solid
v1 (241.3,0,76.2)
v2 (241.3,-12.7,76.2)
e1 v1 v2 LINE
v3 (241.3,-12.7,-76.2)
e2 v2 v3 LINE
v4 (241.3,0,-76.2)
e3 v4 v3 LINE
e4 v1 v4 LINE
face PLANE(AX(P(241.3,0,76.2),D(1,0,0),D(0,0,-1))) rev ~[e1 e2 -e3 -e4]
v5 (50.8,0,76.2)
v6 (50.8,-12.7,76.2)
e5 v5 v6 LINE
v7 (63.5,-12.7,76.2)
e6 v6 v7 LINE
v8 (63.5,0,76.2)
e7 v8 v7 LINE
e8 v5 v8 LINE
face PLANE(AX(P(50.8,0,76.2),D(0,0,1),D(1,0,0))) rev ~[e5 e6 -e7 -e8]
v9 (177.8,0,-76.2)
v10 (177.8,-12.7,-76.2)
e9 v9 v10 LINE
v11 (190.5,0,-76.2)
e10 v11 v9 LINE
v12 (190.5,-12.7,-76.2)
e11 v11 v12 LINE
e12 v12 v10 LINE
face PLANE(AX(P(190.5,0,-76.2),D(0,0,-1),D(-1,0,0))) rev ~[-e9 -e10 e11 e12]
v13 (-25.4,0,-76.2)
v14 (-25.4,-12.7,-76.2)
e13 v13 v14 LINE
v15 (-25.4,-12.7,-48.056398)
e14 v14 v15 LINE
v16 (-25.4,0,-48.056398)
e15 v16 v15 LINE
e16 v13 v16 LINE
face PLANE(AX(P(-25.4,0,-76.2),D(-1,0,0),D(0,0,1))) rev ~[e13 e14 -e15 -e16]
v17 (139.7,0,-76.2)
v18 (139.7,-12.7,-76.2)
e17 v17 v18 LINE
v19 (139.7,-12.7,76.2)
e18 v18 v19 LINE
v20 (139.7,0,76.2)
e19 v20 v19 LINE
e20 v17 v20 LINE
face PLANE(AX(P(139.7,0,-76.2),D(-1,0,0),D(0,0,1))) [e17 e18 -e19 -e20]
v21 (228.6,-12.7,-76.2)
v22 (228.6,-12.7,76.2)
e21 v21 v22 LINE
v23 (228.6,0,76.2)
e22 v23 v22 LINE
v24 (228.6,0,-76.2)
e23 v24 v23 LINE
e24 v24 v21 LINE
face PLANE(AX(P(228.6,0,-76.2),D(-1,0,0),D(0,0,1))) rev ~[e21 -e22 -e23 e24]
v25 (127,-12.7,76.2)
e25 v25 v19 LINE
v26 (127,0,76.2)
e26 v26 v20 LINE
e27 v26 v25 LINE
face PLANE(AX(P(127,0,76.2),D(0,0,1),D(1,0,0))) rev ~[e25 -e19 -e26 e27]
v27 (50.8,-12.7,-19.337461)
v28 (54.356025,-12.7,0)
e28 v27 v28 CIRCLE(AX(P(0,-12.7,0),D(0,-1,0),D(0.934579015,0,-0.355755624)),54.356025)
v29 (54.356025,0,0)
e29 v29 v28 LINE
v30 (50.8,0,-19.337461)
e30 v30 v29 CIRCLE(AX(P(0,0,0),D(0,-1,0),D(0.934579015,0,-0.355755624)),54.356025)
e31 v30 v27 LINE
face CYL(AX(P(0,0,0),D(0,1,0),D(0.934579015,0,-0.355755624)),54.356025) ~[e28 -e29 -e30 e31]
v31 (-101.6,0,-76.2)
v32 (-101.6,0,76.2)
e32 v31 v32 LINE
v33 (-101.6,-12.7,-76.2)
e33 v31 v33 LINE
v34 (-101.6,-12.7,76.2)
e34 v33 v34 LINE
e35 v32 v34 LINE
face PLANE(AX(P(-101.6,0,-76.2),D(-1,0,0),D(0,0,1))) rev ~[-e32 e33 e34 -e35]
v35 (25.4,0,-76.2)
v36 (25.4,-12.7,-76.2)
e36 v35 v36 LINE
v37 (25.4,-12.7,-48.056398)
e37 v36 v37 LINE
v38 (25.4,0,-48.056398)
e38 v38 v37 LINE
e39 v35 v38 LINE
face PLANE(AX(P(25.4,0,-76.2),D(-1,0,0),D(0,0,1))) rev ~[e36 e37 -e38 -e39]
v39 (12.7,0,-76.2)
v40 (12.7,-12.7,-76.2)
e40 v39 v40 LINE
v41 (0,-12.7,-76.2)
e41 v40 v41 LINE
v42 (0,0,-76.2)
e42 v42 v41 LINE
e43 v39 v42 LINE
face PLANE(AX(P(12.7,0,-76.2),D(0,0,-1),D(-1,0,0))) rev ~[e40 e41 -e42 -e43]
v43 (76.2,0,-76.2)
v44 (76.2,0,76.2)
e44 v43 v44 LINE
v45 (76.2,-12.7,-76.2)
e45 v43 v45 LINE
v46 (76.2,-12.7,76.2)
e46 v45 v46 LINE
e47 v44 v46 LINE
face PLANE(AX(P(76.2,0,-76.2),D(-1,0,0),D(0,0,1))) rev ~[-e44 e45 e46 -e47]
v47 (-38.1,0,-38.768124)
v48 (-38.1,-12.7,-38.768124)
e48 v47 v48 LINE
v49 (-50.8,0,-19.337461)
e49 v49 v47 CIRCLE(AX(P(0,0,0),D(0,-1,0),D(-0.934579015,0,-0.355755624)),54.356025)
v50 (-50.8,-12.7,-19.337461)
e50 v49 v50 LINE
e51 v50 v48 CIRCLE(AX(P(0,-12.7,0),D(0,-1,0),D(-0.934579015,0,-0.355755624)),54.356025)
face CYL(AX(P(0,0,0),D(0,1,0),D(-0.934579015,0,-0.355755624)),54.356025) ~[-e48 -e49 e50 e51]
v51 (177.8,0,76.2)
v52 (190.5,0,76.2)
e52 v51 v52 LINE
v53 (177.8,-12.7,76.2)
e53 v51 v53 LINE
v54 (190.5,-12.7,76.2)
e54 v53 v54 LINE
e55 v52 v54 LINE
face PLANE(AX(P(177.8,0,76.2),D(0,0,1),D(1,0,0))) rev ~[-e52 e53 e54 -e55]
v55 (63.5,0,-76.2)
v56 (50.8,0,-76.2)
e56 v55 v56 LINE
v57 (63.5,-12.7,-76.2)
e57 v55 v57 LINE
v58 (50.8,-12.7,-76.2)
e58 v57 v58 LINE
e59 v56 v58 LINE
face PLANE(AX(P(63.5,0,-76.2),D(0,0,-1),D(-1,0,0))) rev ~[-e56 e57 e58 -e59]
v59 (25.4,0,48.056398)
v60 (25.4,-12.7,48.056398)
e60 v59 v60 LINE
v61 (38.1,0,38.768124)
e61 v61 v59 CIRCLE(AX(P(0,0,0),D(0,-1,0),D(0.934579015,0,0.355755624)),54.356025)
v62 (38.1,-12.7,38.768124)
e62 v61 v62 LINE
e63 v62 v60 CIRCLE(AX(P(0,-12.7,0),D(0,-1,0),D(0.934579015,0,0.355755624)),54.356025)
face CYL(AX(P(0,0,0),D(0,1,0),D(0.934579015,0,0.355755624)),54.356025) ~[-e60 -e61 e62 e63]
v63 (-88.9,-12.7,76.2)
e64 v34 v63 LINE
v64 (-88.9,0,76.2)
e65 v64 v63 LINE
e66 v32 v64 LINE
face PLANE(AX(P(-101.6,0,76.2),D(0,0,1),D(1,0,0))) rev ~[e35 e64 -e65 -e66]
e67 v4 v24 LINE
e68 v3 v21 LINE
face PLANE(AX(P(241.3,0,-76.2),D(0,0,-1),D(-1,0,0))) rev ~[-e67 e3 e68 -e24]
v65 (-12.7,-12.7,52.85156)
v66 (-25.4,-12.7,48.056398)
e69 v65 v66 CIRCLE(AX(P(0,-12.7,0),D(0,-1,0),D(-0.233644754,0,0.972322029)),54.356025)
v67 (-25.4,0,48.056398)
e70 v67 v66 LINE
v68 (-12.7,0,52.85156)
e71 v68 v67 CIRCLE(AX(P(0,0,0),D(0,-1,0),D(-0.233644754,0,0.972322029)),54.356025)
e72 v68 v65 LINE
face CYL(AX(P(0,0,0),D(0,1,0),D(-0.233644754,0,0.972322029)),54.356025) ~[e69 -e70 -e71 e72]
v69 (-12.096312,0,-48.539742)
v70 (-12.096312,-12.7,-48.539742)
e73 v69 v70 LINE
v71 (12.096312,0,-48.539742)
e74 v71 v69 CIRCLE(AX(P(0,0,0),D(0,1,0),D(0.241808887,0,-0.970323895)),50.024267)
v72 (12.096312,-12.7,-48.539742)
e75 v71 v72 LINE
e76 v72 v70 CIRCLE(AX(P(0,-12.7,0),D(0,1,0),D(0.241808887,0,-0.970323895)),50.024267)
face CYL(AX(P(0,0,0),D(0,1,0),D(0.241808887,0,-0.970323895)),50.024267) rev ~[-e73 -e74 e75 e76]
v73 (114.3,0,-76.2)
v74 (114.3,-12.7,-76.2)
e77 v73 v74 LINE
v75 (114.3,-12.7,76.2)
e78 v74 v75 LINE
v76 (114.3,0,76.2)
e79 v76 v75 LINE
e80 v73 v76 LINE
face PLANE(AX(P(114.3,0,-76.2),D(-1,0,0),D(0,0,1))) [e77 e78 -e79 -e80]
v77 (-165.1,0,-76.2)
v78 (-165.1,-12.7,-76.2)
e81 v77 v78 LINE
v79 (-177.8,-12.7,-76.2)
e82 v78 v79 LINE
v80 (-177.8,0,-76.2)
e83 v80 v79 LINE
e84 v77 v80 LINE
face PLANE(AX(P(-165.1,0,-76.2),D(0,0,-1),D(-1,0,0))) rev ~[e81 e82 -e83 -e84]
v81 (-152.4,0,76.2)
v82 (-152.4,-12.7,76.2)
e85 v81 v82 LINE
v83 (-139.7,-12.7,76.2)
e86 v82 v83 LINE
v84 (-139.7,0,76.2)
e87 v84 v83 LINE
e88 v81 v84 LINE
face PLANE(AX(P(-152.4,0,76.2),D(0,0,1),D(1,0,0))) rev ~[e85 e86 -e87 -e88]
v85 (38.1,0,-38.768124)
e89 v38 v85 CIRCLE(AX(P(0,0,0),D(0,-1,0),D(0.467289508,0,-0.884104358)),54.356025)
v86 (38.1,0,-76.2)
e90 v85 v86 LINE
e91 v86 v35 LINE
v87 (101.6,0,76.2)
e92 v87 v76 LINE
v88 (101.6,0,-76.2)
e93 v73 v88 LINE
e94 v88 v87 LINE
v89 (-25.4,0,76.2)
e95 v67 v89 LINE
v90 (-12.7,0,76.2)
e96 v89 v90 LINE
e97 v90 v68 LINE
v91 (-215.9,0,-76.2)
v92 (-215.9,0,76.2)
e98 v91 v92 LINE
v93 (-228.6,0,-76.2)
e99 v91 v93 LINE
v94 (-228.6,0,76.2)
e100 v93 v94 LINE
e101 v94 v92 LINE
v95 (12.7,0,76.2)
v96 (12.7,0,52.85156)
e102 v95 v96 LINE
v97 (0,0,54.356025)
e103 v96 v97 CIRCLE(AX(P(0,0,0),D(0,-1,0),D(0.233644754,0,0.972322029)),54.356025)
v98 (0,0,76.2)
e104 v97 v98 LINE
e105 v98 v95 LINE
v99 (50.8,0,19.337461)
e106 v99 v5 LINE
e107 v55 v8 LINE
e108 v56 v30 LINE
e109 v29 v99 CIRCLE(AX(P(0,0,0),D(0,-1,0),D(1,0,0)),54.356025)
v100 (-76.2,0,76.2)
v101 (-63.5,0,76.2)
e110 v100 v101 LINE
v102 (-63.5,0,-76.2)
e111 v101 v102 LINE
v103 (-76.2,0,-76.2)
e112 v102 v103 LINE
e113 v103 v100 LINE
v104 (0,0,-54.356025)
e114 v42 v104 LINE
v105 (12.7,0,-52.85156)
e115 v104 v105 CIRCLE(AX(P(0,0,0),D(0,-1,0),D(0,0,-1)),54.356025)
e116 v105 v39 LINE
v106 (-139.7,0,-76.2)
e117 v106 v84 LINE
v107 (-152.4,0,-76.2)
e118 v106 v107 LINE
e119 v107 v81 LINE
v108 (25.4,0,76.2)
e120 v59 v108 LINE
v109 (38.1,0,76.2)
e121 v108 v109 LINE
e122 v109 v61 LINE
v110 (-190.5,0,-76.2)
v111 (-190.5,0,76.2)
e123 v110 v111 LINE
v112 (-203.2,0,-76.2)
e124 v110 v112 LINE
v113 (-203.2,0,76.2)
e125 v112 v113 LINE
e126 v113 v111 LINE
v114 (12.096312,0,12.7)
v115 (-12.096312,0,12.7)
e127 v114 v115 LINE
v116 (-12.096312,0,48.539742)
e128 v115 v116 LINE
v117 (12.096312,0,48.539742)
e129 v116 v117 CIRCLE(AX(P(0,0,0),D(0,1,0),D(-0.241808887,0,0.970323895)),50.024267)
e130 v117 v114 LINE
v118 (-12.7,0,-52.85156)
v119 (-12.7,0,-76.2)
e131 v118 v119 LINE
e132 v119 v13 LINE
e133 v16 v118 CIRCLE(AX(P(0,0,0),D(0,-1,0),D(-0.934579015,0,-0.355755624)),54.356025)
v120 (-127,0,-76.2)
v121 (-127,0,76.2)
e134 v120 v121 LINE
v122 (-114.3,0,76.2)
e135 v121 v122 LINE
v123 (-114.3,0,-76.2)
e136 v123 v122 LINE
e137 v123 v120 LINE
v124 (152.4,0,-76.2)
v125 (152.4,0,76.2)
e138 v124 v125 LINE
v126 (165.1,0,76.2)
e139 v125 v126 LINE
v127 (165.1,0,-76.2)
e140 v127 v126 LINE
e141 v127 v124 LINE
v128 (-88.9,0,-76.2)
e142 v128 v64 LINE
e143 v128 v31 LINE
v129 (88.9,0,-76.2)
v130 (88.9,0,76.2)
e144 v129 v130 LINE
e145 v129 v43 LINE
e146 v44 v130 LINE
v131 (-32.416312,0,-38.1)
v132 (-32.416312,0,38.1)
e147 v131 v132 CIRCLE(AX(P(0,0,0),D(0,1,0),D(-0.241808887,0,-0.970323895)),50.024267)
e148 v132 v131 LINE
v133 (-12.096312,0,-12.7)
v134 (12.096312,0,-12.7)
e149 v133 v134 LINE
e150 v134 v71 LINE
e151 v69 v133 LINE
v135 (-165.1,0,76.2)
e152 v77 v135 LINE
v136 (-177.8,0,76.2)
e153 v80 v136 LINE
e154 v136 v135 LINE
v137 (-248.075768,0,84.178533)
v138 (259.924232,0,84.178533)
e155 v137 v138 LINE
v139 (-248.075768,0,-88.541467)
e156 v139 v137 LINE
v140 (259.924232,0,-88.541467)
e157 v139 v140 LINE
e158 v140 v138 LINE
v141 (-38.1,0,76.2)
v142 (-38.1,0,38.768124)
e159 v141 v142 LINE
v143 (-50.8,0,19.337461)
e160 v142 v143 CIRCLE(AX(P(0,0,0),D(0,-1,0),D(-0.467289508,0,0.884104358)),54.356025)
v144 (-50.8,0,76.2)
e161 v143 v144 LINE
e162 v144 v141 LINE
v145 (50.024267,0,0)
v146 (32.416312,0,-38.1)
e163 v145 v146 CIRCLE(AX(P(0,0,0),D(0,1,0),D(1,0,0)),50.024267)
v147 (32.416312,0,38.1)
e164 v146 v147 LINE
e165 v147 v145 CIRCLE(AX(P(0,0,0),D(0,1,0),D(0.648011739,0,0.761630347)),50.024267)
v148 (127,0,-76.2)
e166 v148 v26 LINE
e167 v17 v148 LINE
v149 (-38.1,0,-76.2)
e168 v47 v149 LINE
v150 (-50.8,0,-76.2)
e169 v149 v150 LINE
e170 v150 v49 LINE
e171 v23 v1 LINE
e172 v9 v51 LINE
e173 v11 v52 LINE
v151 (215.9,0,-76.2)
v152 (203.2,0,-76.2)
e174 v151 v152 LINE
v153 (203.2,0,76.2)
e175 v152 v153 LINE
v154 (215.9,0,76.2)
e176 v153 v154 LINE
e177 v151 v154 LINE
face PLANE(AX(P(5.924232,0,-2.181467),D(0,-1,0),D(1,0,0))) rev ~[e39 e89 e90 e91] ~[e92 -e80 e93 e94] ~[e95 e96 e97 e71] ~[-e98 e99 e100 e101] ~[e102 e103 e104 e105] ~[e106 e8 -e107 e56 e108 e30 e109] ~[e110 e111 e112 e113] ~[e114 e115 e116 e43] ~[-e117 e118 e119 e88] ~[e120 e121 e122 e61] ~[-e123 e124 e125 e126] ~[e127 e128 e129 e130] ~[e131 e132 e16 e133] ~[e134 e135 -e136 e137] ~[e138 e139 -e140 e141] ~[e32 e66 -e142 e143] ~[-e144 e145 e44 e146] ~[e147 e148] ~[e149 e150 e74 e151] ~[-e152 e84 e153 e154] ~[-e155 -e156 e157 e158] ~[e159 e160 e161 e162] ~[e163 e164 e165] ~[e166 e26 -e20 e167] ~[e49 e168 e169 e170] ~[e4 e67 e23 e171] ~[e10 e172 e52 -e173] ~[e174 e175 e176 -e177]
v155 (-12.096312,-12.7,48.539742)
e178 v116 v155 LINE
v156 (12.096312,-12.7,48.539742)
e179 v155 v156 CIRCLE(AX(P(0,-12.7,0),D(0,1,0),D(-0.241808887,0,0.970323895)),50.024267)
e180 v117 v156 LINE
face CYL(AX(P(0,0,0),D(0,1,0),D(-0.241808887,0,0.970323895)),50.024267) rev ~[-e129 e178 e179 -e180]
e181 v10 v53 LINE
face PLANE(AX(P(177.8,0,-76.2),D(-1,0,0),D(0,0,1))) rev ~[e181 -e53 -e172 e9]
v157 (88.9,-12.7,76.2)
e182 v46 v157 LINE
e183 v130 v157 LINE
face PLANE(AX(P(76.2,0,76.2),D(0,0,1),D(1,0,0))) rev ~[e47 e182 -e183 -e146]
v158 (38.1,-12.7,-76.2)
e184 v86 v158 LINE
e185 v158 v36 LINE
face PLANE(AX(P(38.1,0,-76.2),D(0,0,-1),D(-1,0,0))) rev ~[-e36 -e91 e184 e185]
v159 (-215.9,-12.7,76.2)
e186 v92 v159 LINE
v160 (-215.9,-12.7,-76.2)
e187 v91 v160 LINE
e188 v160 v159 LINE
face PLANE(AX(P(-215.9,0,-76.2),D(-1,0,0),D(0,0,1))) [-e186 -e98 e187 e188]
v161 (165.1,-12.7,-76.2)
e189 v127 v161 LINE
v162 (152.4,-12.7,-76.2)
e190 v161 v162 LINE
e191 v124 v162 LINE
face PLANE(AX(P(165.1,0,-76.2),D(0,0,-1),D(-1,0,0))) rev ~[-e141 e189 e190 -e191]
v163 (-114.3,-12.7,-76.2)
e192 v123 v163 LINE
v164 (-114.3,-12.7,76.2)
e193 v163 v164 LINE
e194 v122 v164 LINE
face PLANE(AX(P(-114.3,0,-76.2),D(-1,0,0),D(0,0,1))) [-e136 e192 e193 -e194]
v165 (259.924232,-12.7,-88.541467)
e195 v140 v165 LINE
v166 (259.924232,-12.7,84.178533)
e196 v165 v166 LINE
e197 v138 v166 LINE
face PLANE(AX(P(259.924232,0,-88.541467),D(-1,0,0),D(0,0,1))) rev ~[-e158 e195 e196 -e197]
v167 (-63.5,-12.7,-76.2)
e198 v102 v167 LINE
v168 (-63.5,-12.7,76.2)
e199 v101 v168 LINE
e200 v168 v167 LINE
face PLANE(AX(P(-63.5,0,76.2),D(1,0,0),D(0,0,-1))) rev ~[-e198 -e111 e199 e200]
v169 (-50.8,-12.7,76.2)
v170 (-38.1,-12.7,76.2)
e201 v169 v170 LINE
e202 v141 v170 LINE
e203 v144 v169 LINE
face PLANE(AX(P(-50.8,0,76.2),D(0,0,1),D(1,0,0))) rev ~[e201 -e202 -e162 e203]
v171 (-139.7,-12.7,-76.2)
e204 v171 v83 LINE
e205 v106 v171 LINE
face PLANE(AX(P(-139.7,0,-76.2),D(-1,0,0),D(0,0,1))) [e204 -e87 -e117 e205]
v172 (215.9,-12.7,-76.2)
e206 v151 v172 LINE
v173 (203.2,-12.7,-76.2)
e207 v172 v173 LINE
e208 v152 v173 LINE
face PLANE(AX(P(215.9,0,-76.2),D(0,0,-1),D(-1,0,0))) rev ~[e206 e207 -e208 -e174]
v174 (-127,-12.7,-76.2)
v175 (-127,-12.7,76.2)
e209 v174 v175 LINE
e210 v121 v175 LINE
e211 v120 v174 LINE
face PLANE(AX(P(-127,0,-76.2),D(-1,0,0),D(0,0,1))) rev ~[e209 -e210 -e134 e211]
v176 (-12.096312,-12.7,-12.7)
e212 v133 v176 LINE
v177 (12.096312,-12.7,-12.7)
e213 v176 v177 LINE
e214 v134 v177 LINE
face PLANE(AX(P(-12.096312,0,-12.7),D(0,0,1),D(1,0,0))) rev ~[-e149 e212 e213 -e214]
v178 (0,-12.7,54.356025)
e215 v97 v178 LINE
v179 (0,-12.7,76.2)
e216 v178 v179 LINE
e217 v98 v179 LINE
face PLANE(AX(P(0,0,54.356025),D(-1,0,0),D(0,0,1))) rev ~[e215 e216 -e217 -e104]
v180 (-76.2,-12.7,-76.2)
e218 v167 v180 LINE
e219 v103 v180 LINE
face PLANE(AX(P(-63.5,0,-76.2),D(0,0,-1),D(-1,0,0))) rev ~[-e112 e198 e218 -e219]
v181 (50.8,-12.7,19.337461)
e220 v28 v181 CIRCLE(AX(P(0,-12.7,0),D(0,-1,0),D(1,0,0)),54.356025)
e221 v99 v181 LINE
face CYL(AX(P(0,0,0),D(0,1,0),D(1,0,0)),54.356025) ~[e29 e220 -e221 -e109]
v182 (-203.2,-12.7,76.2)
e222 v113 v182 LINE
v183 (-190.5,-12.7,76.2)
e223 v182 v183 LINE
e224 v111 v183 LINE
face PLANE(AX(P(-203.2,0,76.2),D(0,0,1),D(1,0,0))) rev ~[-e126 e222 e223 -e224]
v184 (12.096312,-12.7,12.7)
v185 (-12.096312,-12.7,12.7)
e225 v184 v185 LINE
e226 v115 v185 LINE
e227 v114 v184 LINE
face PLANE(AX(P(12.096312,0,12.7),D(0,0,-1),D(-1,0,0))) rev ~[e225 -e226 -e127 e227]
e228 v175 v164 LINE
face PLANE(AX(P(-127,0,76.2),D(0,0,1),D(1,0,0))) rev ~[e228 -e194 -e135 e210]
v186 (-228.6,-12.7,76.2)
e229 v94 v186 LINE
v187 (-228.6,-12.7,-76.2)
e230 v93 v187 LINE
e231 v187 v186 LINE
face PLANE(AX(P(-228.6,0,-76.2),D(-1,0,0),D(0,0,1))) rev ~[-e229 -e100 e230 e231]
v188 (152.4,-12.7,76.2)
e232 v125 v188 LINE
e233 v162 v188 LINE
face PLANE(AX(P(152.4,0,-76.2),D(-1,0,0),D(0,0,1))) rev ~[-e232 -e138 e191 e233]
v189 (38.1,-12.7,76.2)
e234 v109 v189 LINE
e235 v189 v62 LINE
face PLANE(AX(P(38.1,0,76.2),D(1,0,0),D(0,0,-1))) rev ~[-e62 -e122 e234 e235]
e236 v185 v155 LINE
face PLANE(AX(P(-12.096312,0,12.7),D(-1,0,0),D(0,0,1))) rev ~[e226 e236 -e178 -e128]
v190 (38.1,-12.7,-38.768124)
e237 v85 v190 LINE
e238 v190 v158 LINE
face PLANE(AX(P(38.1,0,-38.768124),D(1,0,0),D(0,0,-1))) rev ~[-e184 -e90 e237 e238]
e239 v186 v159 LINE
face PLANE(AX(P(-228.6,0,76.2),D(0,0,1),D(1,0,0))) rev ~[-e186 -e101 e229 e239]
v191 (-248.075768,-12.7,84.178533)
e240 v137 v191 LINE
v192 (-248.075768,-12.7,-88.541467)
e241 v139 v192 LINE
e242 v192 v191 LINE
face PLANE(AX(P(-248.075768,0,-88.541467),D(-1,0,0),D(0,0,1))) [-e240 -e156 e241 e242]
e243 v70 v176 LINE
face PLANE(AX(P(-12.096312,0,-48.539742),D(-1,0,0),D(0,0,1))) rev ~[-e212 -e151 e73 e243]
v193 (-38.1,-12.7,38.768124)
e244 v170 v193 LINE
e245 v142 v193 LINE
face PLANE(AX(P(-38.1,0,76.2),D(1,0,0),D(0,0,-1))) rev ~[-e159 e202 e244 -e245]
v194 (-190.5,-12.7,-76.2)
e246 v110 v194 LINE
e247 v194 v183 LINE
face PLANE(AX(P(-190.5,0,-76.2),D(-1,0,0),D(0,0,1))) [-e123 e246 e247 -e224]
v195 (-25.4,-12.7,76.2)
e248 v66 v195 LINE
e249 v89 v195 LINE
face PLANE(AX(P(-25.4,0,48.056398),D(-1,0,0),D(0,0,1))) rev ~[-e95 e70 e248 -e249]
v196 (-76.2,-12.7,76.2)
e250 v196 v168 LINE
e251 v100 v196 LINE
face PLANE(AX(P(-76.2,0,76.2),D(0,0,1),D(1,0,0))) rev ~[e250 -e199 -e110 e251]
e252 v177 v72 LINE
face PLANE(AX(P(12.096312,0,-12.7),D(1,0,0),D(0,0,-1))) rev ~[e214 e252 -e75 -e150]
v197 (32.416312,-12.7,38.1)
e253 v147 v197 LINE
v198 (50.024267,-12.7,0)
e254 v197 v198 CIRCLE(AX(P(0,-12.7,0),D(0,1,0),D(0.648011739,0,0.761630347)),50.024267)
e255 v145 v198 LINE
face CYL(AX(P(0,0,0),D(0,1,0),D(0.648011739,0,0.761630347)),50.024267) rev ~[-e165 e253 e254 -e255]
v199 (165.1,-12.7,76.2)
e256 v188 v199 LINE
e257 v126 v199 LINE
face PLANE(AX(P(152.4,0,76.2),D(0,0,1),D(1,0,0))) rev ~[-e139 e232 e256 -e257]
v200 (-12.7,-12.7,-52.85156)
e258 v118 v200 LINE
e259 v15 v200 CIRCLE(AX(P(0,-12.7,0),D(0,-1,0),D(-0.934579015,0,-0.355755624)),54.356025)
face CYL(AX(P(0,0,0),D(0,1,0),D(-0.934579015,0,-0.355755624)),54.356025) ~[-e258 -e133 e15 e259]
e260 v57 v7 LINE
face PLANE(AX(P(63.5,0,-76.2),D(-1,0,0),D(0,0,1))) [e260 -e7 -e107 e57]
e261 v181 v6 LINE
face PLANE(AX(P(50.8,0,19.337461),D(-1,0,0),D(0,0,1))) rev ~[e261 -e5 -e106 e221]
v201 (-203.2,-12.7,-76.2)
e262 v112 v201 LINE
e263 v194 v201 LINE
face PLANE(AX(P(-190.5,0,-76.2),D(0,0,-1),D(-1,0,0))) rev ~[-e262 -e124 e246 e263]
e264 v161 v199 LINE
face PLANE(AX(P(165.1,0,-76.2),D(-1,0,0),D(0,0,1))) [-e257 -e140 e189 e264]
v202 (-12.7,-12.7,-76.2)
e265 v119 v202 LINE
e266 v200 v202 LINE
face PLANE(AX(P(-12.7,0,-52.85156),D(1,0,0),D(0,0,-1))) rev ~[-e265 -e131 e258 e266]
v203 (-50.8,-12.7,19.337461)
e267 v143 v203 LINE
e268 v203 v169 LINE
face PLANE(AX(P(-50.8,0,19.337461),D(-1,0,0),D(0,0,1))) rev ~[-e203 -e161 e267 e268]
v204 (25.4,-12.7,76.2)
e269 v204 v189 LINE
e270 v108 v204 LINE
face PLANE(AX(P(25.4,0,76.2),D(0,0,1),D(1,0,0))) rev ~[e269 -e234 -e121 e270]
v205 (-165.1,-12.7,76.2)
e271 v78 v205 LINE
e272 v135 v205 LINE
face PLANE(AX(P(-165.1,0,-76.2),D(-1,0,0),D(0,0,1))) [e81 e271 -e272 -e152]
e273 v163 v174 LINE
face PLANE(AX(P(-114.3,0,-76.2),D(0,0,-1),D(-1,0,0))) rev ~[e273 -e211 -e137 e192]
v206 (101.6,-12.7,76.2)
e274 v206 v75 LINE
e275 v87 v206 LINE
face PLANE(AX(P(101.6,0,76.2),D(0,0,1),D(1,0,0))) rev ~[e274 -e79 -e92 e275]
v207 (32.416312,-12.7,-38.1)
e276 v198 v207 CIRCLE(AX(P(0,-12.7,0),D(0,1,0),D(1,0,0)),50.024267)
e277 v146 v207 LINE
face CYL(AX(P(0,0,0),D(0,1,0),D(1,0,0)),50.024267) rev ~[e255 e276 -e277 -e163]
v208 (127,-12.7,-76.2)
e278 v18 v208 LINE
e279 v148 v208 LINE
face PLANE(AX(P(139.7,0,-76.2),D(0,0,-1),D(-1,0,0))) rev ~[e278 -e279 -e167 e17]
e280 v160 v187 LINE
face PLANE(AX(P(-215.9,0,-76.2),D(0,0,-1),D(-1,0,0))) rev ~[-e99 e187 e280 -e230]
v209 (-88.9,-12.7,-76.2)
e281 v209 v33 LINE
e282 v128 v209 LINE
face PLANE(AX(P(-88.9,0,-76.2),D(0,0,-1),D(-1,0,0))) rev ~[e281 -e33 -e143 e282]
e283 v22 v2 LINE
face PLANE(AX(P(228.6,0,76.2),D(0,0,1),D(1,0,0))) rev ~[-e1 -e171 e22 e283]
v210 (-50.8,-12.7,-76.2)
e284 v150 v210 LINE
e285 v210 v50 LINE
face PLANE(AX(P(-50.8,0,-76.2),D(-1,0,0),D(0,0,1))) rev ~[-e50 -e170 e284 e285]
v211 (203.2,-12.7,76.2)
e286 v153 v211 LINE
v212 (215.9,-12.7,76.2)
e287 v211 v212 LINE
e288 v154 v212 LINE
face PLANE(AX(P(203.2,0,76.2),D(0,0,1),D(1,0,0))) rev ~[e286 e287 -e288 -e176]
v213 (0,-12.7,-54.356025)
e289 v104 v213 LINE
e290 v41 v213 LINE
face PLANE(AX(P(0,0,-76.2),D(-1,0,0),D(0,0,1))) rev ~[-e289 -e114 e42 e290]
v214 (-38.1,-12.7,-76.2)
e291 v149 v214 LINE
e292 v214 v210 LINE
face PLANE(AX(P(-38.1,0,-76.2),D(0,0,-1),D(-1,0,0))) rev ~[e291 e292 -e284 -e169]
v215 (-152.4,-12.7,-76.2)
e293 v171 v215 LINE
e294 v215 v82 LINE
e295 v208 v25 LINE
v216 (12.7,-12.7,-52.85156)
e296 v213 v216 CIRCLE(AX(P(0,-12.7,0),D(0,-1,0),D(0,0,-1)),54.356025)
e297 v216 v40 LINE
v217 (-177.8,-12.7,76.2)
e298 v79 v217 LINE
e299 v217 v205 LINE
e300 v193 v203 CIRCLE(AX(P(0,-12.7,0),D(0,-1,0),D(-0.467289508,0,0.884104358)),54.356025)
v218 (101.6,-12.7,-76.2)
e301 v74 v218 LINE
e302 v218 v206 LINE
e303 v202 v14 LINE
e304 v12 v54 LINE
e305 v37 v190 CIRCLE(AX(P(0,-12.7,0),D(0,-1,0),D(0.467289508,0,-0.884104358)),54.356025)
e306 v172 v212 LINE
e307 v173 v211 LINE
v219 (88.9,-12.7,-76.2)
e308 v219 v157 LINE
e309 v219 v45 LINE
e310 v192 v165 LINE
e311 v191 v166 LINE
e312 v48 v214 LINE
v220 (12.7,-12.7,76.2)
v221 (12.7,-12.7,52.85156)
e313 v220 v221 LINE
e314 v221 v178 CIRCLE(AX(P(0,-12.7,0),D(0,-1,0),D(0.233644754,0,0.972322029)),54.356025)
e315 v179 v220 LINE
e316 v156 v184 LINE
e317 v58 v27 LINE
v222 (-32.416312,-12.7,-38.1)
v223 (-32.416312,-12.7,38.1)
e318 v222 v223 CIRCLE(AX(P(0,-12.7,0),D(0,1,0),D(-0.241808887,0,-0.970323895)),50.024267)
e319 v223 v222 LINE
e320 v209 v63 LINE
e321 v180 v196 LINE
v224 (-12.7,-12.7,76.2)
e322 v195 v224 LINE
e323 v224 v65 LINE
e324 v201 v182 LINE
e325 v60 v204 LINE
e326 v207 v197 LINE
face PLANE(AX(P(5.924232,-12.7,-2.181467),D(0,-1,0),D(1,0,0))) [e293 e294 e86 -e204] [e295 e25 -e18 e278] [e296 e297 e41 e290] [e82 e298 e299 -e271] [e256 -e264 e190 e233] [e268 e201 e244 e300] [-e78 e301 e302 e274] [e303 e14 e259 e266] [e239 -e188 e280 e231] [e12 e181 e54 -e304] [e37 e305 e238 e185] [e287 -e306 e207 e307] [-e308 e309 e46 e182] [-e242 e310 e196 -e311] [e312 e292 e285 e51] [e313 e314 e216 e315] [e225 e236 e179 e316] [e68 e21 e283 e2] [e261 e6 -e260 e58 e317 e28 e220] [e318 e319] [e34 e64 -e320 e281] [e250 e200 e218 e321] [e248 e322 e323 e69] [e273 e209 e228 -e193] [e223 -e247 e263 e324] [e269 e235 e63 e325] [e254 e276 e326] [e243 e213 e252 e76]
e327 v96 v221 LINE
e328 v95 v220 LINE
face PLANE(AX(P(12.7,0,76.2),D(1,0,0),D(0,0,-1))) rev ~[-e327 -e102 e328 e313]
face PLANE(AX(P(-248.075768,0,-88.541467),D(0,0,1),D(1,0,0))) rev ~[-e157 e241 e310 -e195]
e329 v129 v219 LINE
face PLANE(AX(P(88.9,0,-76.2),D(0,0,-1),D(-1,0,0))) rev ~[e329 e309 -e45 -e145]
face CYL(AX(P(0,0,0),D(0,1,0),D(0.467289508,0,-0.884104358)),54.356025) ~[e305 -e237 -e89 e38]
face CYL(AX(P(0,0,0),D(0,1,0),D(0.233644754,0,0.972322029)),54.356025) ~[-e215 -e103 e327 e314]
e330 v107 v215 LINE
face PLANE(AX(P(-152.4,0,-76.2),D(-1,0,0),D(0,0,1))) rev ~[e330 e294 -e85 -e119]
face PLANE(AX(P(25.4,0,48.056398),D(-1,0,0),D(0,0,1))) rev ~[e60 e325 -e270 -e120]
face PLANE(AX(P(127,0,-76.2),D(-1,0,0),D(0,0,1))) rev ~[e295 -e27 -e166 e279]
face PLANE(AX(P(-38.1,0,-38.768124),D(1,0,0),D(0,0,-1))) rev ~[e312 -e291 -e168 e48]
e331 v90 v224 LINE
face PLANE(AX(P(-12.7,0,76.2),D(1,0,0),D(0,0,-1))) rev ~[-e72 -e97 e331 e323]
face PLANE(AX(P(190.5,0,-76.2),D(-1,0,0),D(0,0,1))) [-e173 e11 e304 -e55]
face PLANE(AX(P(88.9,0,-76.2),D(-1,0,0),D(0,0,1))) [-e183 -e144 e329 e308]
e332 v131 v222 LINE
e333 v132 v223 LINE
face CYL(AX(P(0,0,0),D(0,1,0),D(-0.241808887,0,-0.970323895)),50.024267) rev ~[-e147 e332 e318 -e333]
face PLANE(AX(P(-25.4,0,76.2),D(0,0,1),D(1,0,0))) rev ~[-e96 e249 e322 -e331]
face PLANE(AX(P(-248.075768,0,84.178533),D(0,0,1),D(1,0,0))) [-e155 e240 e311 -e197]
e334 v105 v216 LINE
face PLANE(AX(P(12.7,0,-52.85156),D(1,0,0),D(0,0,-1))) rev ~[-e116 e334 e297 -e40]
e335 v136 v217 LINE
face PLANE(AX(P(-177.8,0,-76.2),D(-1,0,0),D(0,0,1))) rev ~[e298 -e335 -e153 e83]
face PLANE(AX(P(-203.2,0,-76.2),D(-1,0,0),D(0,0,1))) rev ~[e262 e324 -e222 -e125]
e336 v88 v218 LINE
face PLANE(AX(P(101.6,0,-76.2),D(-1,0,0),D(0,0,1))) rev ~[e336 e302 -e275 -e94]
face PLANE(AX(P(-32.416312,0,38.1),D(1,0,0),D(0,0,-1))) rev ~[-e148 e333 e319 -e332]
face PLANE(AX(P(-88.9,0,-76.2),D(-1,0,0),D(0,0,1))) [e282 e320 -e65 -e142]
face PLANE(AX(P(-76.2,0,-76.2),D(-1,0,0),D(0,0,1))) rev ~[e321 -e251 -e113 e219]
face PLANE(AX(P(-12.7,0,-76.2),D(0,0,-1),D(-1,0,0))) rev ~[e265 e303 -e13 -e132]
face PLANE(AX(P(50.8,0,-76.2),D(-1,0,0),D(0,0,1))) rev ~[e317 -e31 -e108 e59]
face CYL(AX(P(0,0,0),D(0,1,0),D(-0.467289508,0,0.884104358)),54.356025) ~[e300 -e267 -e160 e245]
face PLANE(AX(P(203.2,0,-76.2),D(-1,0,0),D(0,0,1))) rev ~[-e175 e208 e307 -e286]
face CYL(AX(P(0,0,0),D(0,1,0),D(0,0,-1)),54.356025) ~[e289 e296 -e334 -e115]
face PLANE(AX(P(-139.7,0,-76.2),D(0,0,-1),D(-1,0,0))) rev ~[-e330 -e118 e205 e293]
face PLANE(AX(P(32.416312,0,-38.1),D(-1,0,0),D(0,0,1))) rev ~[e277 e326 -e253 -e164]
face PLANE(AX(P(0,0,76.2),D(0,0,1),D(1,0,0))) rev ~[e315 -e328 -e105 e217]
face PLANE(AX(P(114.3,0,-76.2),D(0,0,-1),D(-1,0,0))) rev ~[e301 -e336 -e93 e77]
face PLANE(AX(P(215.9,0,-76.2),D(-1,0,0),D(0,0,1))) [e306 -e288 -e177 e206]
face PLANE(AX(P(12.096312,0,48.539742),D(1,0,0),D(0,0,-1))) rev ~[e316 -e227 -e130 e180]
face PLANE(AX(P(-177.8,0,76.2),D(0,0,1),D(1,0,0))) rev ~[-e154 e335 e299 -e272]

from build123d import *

# Parameters (mm, degrees)
F0_W     = 508
F0_H     = 172.72
F0_W_2   = 12.7
F0_H_2   = 152.4
F1_DEPTH = 12.7


# Not quite as in the source:
# - a feature names something its author has since deleted; it is built from what else it names


with BuildPart() as f1:
    # F0 (on Front) → F1 (new body)
    with BuildSketch(Plane.XZ):
        with Locations((5.9242316484, -2.1814669756)):
            Rectangle(F0_W, F0_H)
        Polygon((215.9, 76.2), (228.6, 76.2), (241.3, 76.2), (241.3, -76.2), (228.6, -76.2), (215.9, -76.2), (203.2, -76.2), (190.5, -76.2), (177.8, -76.2), (165.1, -76.2), (152.4, -76.2), (139.7, -76.2), (127, -76.2), (114.3, -76.2), (101.6, -76.2), (88.9, -76.2), (76.2, -76.2), (63.5, -76.2), (50.8, -76.2), (38.1, -76.2), (25.4, -76.2), (12.7, -76.2), (0, -76.2), (-12.7, -76.2), (-25.4, -76.2), (-38.1, -76.2), (-50.8, -76.2), (-63.5, -76.2), (-76.2, -76.2), (-88.9, -76.2), (-101.6, -76.2), (-114.3, -76.2), (-127, -76.2), (-139.7, -76.2), (-152.4, -76.2), (-165.1, -76.2), (-177.8, -76.2), (-190.5, -76.2), (-203.2, -76.2), (-215.9, -76.2), (-228.6, -76.2), (-228.6, 76.2), (-215.9, 76.2), (-203.2, 76.2), (-190.5, 76.2), (-177.8, 76.2), (-165.1, 76.2), (-152.4, 76.2), (-139.7, 76.2), (-127, 76.2), (-114.3, 76.2), (-101.6, 76.2), (-88.9, 76.2), (-76.2, 76.2), (-63.5, 76.2), (-50.8, 76.2), (-38.1, 76.2), (-25.4, 76.2), (-12.7, 76.2), (0, 76.2), (12.7, 76.2), (25.4, 76.2), (38.1, 76.2), (50.8, 76.2), (63.5, 76.2), (76.2, 76.2), (88.9, 76.2), (101.6, 76.2), (114.3, 76.2), (127, 76.2), (139.7, 76.2), (152.4, 76.2), (165.1, 76.2), (177.8, 76.2), (190.5, 76.2), (203.2, 76.2), align=None, mode=Mode.SUBTRACT)
        with BuildLine():
            ThreePointArc((54.3560246605, 0), (53.4596271482, 9.8308535779), (50.8, 19.3374614904))
            ThreePointArc((50.8, 19.3374614904), (45.4993423984, 29.7386492331), (38.1, 38.7681237216))
            ThreePointArc((38.1, 38.7681237216), (32.0878561317, 43.8742168678), (25.4, 48.056398293))
            ThreePointArc((25.4, 48.056398293), (19.2002837078, 50.8520060807), (12.7, 52.8515602125))
            ThreePointArc((12.7, 52.8515602125), (6.3944001532, 53.9785981994), (0, 54.3560246605))
            ThreePointArc((0, 54.3560246605), (-6.3944001532, 53.9785981994), (-12.7, 52.8515602125))
            ThreePointArc((-12.7, 52.8515602125), (-19.2002837078, 50.8520060807), (-25.4, 48.056398293))
            ThreePointArc((-25.4, 48.056398293), (-32.0878561317, 43.8742168678), (-38.1, 38.7681237216))
            ThreePointArc((-38.1, 38.7681237216), (-45.4993423984, 29.7386492331), (-50.8, 19.3374614904))
            ThreePointArc((-50.8, 19.3374614904), (-54.3560246605, 0), (-50.8, -19.3374614904))
            ThreePointArc((-50.8, -19.3374614904), (-45.4993423984, -29.7386492331), (-38.1, -38.7681237216))
            ThreePointArc((-38.1, -38.7681237216), (-32.0878561317, -43.8742168678), (-25.4, -48.056398293))
            ThreePointArc((-25.4, -48.056398293), (-19.2002837078, -50.8520060807), (-12.7, -52.8515602125))
            ThreePointArc((-12.7, -52.8515602125), (-6.3944001532, -53.9785981994), (0, -54.3560246605))
            ThreePointArc((0, -54.3560246605), (6.3944001532, -53.9785981994), (12.7, -52.8515602125))
            ThreePointArc((12.7, -52.8515602125), (19.2002837078, -50.8520060807), (25.4, -48.056398293))
            ThreePointArc((25.4, -48.056398293), (32.0878561317, -43.8742168678), (38.1, -38.7681237216))
            ThreePointArc((38.1, -38.7681237216), (45.4993423984, -29.7386492331), (50.8, -19.3374614904))
            ThreePointArc((50.8, -19.3374614904), (53.4596271482, -9.8308535779), (54.3560246605, 0))
        make_face()
        with BuildLine():
            ThreePointArc((32.4163123757, 38.1), (45.4094130092, 20.9860076765), (50.0242671914, 0))
            ThreePointArc((50.0242671914, 0), (45.4094130092, -20.9860076765), (32.4163123757, -38.1))
            ThreePointArc((32.4163123757, -38.1), (22.8602382496, -44.4953572321), (12.0963123757, -48.5397418097))
            ThreePointArc((12.0963123757, -48.5397418097), (0, -50.0242671914), (-12.0963123757, -48.5397418097))
            ThreePointArc((-12.0963123757, -48.5397418097), (-22.8602382496, -44.4953572321), (-32.4163123757, -38.1))
            ThreePointArc((-32.4163123757, -38.1), (-50.0242671914, 0), (-32.4163123757, 38.1))
            ThreePointArc((-32.4163123757, 38.1), (-22.8602382496, 44.4953572321), (-12.0963123757, 48.5397418097))
            ThreePointArc((-12.0963123757, 48.5397418097), (0, 50.0242671914), (12.0963123757, 48.5397418097))
            ThreePointArc((12.0963123757, 48.5397418097), (22.8602382496, 44.4953572321), (32.4163123757, 38.1))
        make_face(mode=Mode.SUBTRACT)
        Polygon((32.4163123757, -38.1), (32.4163123757, 38.1), (12.0963123757, 38.1), (12.0963123757, 12.7), (-12.0963123757, 12.7), (-12.0963123757, 38.1), (-32.4163123757, 38.1), (-32.4163123757, -38.1), (-12.0963123757, -38.1), (-12.0963123757, -12.7), (12.0963123757, -12.7), (12.0963123757, -38.1), align=None)
        with Locations((-209.55, 0)):
            Rectangle(F0_W_2, F0_H_2)
        with Locations((-184.15, 0)):
            Rectangle(F0_W_2, F0_H_2)
        with Locations((-158.75, 0)):
            Rectangle(F0_W_2, F0_H_2)
        with Locations((-133.35, 0)):
            Rectangle(F0_W_2, F0_H_2)
        with Locations((-107.95, 0)):
            Rectangle(F0_W_2, F0_H_2)
        with Locations((-82.55, 0)):
            Rectangle(F0_W_2, F0_H_2)
        with Locations((69.85, 0)):
            Rectangle(F0_W_2, F0_H_2)
        with Locations((95.25, 0)):
            Rectangle(F0_W_2, F0_H_2)
        with Locations((120.65, 0)):
            Rectangle(F0_W_2, F0_H_2)
        with Locations((146.05, 0)):
            Rectangle(F0_W_2, F0_H_2)
        with Locations((171.45, 0)):
            Rectangle(F0_W_2, F0_H_2)
        with Locations((196.85, 0)):
            Rectangle(F0_W_2, F0_H_2)
        with Locations((222.25, 0)):
            Rectangle(F0_W_2, F0_H_2)
        with BuildLine():
            Line((-50.8, 19.3374614904), (-50.8, 76.2))
            Line((-50.8, 76.2), (-63.5, 76.2))
            Line((-63.5, 76.2), (-63.5, -76.2))
            Line((-63.5, -76.2), (-50.8, -76.2))
            Line((-50.8, -76.2), (-50.8, -19.3374614904))
            ThreePointArc((-50.8, -19.3374614904), (-54.3560246605, 0), (-50.8, 19.3374614904))
        make_face()
        with BuildLine():
            Line((50.8, 19.3374614904), (50.8, 76.2))
            Line((50.8, 76.2), (38.1, 76.2))
            Line((38.1, 76.2), (38.1, 38.7681237216))
            ThreePointArc((38.1, 38.7681237216), (45.4993423984, 29.7386492331), (50.8, 19.3374614904))
        make_face()
        with BuildLine():
            Line((38.1, -76.2), (50.8, -76.2))
            Line((50.8, -76.2), (50.8, -19.3374614904))
            ThreePointArc((50.8, -19.3374614904), (45.4993423984, -29.7386492331), (38.1, -38.7681237216))
            Line((38.1, -38.7681237216), (38.1, -76.2))
        make_face()
        with BuildLine():
            Line((-25.4, 48.056398293), (-25.4, 76.2))
            Line((-25.4, 76.2), (-38.1, 76.2))
            Line((-38.1, 76.2), (-38.1, 38.7681237216))
            ThreePointArc((-38.1, 38.7681237216), (-32.0878561317, 43.8742168678), (-25.4, 48.056398293))
        make_face()
        with BuildLine():
            Line((-38.1, -76.2), (-25.4, -76.2))
            Line((-25.4, -76.2), (-25.4, -48.056398293))
            ThreePointArc((-25.4, -48.056398293), (-32.0878561317, -43.8742168678), (-38.1, -38.7681237216))
            Line((-38.1, -38.7681237216), (-38.1, -76.2))
        make_face()
        with BuildLine():
            Line((25.4, 48.056398293), (25.4, 76.2))
            Line((25.4, 76.2), (12.7, 76.2))
            Line((12.7, 76.2), (12.7, 52.8515602125))
            ThreePointArc((12.7, 52.8515602125), (19.2002837078, 50.8520060807), (25.4, 48.056398293))
        make_face()
        with BuildLine():
            Line((12.7, -76.2), (25.4, -76.2))
            Line((25.4, -76.2), (25.4, -48.056398293))
            ThreePointArc((25.4, -48.056398293), (19.2002837078, -50.8520060807), (12.7, -52.8515602125))
            Line((12.7, -52.8515602125), (12.7, -76.2))
        make_face()
        with BuildLine():
            Line((0, 54.3560246605), (0, 76.2))
            Line((0, 76.2), (-12.7, 76.2))
            Line((-12.7, 76.2), (-12.7, 52.8515602125))
            ThreePointArc((-12.7, 52.8515602125), (-6.3944001532, 53.9785981994), (0, 54.3560246605))
        make_face()
        with BuildLine():
            Line((-12.7, -76.2), (0, -76.2))
            Line((0, -76.2), (0, -54.3560246605))
            ThreePointArc((0, -54.3560246605), (-6.3944001532, -53.9785981994), (-12.7, -52.8515602125))
            Line((-12.7, -52.8515602125), (-12.7, -76.2))
        make_face()
        with BuildLine():
            Line((-12.0963123757, 38.1), (-12.0963123757, 48.5397418097))
            ThreePointArc((-12.0963123757, 48.5397418097), (-22.8602382496, 44.4953572321), (-32.4163123757, 38.1))
            Line((-32.4163123757, 38.1), (-12.0963123757, 38.1))
        make_face()
        with BuildLine():
            Line((12.0963123757, 38.1), (32.4163123757, 38.1))
            ThreePointArc((32.4163123757, 38.1), (22.8602382496, 44.4953572321), (12.0963123757, 48.5397418097))
            Line((12.0963123757, 48.5397418097), (12.0963123757, 38.1))
        make_face()
        with BuildLine():
            ThreePointArc((12.0963123757, -48.5397418097), (22.8602382496, -44.4953572321), (32.4163123757, -38.1))
            Line((32.4163123757, -38.1), (12.0963123757, -38.1))
            Line((12.0963123757, -38.1), (12.0963123757, -48.5397418097))
        make_face()
        with BuildLine():
            ThreePointArc((-32.4163123757, -38.1), (-22.8602382496, -44.4953572321), (-12.0963123757, -48.5397418097))
            Line((-12.0963123757, -48.5397418097), (-12.0963123757, -38.1))
            Line((-12.0963123757, -38.1), (-32.4163123757, -38.1))
        make_face()
    extrude(amount=F1_DEPTH)


solid = f1.part
